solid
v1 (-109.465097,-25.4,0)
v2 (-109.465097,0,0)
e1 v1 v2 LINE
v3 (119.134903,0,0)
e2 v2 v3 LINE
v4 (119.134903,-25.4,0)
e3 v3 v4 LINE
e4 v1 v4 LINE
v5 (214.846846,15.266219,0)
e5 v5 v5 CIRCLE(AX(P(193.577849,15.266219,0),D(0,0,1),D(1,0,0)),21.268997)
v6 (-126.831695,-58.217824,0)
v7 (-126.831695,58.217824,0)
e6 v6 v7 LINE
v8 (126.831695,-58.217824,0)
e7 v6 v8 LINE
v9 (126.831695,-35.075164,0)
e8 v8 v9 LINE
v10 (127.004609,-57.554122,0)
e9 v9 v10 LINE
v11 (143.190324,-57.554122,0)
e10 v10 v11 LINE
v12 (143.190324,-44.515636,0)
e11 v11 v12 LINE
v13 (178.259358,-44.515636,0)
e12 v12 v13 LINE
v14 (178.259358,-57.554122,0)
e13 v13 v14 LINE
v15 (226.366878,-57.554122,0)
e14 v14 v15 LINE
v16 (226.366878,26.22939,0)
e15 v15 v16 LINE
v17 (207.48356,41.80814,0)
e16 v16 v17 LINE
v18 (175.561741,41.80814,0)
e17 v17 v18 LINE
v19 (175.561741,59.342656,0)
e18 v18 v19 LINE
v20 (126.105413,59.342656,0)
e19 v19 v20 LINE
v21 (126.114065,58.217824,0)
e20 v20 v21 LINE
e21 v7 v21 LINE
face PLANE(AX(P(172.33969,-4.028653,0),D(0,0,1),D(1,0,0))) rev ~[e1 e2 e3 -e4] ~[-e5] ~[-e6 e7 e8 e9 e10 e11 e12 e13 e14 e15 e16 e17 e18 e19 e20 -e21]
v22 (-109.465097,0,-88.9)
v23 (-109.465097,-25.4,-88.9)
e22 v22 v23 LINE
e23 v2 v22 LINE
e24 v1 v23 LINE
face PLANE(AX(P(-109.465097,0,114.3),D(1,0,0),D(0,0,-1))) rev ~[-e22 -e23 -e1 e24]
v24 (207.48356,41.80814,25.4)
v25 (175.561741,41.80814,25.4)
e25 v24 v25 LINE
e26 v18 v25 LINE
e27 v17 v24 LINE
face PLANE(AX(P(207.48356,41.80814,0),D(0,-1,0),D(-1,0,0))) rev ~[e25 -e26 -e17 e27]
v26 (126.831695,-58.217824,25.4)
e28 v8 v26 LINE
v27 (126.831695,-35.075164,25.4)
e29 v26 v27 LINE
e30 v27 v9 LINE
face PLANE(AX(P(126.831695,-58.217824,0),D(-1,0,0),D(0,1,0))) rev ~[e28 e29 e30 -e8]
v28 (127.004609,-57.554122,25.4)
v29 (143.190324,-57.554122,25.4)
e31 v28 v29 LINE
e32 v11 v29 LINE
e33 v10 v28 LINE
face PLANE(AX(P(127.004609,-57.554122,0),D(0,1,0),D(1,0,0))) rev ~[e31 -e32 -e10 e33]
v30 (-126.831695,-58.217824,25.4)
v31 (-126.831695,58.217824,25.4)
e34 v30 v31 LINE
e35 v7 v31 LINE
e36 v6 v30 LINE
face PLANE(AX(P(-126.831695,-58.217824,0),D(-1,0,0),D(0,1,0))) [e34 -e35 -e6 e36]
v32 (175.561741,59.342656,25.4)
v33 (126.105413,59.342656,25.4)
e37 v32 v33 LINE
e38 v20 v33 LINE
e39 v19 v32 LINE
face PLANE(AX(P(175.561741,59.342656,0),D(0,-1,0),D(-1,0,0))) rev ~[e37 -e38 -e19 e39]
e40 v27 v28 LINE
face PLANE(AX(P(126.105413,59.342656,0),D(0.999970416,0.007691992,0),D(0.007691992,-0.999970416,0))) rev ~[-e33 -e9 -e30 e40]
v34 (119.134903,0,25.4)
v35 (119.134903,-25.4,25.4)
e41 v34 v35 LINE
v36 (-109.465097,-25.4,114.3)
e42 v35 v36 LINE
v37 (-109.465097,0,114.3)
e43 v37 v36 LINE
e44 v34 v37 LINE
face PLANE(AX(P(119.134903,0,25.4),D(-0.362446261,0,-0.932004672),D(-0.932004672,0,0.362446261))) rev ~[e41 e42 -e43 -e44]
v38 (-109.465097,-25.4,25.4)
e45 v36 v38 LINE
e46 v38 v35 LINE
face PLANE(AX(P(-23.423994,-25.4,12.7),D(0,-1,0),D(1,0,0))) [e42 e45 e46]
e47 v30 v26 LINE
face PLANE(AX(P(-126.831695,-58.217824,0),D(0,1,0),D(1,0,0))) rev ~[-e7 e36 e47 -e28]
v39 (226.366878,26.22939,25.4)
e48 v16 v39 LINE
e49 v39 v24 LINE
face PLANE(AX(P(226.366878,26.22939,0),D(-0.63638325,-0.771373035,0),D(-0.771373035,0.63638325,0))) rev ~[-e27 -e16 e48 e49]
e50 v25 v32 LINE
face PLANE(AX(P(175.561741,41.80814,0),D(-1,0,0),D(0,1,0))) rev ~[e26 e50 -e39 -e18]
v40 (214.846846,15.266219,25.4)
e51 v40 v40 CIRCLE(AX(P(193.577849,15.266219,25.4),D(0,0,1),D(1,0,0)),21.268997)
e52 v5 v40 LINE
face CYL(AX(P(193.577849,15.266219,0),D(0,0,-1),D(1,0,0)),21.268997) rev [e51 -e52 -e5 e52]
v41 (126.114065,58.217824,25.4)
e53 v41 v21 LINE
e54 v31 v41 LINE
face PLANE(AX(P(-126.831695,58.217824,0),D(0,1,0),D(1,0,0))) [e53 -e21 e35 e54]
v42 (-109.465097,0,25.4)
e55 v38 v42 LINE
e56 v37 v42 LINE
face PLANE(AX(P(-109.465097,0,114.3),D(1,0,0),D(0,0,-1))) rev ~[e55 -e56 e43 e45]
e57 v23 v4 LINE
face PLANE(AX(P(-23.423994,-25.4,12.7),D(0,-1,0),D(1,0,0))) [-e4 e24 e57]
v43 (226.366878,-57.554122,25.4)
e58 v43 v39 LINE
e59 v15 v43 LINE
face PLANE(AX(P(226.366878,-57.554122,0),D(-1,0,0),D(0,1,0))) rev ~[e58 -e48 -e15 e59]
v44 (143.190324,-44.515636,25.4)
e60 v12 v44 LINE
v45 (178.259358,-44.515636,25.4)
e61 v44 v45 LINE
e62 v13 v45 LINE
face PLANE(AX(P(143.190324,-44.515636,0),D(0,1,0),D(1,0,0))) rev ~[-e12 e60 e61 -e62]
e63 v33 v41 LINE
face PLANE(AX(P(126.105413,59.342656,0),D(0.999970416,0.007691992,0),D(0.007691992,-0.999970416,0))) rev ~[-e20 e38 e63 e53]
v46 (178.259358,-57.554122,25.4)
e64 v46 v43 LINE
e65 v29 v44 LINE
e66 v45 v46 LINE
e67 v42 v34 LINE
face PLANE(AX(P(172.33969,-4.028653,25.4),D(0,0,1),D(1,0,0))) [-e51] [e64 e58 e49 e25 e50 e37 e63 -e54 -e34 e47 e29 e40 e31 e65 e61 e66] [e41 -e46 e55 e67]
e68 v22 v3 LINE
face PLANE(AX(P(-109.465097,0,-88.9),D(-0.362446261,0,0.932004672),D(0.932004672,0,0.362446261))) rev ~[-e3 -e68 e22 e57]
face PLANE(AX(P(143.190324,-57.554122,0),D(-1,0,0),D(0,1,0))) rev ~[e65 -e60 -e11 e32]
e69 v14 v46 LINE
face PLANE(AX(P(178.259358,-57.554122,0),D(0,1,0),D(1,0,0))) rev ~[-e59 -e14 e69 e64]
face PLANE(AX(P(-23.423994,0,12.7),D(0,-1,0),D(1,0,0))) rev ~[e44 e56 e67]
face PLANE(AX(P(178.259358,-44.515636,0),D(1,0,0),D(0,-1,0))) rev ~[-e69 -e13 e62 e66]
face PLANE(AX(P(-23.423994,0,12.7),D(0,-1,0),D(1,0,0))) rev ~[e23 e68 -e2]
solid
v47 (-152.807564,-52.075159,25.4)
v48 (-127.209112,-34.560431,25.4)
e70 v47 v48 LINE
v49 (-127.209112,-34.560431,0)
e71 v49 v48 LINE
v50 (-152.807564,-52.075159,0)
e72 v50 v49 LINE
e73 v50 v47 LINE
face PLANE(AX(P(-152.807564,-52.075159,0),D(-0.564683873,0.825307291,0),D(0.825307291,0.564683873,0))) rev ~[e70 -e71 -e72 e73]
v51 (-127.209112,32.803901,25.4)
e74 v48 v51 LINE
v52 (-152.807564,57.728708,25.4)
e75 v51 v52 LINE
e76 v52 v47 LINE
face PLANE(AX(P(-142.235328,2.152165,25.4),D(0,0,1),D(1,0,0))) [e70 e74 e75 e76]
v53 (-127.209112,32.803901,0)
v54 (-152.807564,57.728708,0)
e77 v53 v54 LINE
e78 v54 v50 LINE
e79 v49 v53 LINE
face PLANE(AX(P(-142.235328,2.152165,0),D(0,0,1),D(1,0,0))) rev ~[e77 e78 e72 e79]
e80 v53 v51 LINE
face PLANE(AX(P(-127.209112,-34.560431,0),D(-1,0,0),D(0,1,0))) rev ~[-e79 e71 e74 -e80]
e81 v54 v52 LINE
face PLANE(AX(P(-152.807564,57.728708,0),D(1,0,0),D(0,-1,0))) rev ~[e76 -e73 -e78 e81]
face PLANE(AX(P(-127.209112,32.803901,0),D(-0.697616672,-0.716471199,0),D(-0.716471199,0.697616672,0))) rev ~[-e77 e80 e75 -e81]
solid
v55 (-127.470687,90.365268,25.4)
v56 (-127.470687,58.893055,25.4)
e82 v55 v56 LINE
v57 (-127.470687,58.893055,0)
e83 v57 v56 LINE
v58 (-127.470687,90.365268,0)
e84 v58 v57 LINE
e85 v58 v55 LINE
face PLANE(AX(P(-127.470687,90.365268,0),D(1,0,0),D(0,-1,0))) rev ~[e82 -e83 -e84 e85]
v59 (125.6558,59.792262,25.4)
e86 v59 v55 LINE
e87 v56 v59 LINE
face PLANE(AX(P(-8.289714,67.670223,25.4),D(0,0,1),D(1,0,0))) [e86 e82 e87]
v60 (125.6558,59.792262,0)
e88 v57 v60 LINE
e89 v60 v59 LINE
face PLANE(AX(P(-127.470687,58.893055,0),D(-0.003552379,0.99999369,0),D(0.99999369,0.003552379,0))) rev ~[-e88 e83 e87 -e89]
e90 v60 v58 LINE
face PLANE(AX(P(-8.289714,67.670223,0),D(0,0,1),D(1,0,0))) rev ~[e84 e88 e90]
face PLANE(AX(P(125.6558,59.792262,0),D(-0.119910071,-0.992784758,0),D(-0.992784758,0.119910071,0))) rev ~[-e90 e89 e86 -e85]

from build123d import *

# Parameters (mm, degrees)
F0_W     = 253.6633908749
F0_H     = 116.4356470108
F5_DEPTH = 25.4
F8_DEPTH = 25.4
F1_R     = 21.2689966395
F9_DEPTH = 25.4


# Not quite as in the source:
# - a feature of the source that left no trace in its solid (it failed there, or was rolled back) is left out


with BuildPart() as f5:
    # F0 (on Top) → F5 (new body)
    with BuildSketch(Plane.XY):
        Rectangle(F0_W, F0_H)
    extrude(amount=F5_DEPTH)

    # F7 (on Front) → F8 (join)
    with BuildSketch(Plane.XZ):
        Polygon((-109.4650974564, 25.4), (-109.4650974564, 0), (-109.4650974564, -88.9), (119.1349025436, 0), (119.1349025436, 25.4), (-109.4650974564, 114.3), align=None)
    extrude(amount=F8_DEPTH)

    # F1 (on Top) → F9 (join)
    with BuildSketch(Plane.XY):
        Polygon((175.5617409945, 59.3426562846), (126.1054128408, 59.3426562846), (127.0046085119, -57.5541220605), (143.1903243065, -57.5541220605), (143.1903243065, -44.5156358182), (178.25935781, -44.5156358182), (178.25935781, -57.5541220605), (226.3668775558, -57.5541220605), (226.3668775558, -44.5156358182), (226.3668775558, -17.5394564867), (226.3668775558, 0), (226.3668775558, 26.2293902971), (207.4835598469, 41.8081395328), (175.5617409945, 41.8081395328), align=None)
        with Locations((193.577849129, 15.2662187056)):
            Circle(F1_R, mode=Mode.SUBTRACT)
    extrude(amount=F9_DEPTH)


with BuildPart() as f5b:
    # F3 (on Top) → F5, piece 2 (new body)
    with BuildSketch(Plane.XY):
        Polygon((-127.4706870317, 90.36526829), (-127.4706870317, 58.8930547237), (125.6558001041, 59.7922615707), align=None)
    extrude(amount=F5_DEPTH)


with BuildPart() as f5c:
    # F4 (on Top) → F5, piece 3 (new body)
    with BuildSketch(Plane.XY):
        Polygon((-152.8075635433, -52.0751588047), (-127.2091120481, -34.560430795), (-127.2091120481, 32.8039005399), (-152.8075635433, 57.7287077904), align=None)
    extrude(amount=F5_DEPTH)


solid = Compound([f5.part, f5b.part, f5c.part])
